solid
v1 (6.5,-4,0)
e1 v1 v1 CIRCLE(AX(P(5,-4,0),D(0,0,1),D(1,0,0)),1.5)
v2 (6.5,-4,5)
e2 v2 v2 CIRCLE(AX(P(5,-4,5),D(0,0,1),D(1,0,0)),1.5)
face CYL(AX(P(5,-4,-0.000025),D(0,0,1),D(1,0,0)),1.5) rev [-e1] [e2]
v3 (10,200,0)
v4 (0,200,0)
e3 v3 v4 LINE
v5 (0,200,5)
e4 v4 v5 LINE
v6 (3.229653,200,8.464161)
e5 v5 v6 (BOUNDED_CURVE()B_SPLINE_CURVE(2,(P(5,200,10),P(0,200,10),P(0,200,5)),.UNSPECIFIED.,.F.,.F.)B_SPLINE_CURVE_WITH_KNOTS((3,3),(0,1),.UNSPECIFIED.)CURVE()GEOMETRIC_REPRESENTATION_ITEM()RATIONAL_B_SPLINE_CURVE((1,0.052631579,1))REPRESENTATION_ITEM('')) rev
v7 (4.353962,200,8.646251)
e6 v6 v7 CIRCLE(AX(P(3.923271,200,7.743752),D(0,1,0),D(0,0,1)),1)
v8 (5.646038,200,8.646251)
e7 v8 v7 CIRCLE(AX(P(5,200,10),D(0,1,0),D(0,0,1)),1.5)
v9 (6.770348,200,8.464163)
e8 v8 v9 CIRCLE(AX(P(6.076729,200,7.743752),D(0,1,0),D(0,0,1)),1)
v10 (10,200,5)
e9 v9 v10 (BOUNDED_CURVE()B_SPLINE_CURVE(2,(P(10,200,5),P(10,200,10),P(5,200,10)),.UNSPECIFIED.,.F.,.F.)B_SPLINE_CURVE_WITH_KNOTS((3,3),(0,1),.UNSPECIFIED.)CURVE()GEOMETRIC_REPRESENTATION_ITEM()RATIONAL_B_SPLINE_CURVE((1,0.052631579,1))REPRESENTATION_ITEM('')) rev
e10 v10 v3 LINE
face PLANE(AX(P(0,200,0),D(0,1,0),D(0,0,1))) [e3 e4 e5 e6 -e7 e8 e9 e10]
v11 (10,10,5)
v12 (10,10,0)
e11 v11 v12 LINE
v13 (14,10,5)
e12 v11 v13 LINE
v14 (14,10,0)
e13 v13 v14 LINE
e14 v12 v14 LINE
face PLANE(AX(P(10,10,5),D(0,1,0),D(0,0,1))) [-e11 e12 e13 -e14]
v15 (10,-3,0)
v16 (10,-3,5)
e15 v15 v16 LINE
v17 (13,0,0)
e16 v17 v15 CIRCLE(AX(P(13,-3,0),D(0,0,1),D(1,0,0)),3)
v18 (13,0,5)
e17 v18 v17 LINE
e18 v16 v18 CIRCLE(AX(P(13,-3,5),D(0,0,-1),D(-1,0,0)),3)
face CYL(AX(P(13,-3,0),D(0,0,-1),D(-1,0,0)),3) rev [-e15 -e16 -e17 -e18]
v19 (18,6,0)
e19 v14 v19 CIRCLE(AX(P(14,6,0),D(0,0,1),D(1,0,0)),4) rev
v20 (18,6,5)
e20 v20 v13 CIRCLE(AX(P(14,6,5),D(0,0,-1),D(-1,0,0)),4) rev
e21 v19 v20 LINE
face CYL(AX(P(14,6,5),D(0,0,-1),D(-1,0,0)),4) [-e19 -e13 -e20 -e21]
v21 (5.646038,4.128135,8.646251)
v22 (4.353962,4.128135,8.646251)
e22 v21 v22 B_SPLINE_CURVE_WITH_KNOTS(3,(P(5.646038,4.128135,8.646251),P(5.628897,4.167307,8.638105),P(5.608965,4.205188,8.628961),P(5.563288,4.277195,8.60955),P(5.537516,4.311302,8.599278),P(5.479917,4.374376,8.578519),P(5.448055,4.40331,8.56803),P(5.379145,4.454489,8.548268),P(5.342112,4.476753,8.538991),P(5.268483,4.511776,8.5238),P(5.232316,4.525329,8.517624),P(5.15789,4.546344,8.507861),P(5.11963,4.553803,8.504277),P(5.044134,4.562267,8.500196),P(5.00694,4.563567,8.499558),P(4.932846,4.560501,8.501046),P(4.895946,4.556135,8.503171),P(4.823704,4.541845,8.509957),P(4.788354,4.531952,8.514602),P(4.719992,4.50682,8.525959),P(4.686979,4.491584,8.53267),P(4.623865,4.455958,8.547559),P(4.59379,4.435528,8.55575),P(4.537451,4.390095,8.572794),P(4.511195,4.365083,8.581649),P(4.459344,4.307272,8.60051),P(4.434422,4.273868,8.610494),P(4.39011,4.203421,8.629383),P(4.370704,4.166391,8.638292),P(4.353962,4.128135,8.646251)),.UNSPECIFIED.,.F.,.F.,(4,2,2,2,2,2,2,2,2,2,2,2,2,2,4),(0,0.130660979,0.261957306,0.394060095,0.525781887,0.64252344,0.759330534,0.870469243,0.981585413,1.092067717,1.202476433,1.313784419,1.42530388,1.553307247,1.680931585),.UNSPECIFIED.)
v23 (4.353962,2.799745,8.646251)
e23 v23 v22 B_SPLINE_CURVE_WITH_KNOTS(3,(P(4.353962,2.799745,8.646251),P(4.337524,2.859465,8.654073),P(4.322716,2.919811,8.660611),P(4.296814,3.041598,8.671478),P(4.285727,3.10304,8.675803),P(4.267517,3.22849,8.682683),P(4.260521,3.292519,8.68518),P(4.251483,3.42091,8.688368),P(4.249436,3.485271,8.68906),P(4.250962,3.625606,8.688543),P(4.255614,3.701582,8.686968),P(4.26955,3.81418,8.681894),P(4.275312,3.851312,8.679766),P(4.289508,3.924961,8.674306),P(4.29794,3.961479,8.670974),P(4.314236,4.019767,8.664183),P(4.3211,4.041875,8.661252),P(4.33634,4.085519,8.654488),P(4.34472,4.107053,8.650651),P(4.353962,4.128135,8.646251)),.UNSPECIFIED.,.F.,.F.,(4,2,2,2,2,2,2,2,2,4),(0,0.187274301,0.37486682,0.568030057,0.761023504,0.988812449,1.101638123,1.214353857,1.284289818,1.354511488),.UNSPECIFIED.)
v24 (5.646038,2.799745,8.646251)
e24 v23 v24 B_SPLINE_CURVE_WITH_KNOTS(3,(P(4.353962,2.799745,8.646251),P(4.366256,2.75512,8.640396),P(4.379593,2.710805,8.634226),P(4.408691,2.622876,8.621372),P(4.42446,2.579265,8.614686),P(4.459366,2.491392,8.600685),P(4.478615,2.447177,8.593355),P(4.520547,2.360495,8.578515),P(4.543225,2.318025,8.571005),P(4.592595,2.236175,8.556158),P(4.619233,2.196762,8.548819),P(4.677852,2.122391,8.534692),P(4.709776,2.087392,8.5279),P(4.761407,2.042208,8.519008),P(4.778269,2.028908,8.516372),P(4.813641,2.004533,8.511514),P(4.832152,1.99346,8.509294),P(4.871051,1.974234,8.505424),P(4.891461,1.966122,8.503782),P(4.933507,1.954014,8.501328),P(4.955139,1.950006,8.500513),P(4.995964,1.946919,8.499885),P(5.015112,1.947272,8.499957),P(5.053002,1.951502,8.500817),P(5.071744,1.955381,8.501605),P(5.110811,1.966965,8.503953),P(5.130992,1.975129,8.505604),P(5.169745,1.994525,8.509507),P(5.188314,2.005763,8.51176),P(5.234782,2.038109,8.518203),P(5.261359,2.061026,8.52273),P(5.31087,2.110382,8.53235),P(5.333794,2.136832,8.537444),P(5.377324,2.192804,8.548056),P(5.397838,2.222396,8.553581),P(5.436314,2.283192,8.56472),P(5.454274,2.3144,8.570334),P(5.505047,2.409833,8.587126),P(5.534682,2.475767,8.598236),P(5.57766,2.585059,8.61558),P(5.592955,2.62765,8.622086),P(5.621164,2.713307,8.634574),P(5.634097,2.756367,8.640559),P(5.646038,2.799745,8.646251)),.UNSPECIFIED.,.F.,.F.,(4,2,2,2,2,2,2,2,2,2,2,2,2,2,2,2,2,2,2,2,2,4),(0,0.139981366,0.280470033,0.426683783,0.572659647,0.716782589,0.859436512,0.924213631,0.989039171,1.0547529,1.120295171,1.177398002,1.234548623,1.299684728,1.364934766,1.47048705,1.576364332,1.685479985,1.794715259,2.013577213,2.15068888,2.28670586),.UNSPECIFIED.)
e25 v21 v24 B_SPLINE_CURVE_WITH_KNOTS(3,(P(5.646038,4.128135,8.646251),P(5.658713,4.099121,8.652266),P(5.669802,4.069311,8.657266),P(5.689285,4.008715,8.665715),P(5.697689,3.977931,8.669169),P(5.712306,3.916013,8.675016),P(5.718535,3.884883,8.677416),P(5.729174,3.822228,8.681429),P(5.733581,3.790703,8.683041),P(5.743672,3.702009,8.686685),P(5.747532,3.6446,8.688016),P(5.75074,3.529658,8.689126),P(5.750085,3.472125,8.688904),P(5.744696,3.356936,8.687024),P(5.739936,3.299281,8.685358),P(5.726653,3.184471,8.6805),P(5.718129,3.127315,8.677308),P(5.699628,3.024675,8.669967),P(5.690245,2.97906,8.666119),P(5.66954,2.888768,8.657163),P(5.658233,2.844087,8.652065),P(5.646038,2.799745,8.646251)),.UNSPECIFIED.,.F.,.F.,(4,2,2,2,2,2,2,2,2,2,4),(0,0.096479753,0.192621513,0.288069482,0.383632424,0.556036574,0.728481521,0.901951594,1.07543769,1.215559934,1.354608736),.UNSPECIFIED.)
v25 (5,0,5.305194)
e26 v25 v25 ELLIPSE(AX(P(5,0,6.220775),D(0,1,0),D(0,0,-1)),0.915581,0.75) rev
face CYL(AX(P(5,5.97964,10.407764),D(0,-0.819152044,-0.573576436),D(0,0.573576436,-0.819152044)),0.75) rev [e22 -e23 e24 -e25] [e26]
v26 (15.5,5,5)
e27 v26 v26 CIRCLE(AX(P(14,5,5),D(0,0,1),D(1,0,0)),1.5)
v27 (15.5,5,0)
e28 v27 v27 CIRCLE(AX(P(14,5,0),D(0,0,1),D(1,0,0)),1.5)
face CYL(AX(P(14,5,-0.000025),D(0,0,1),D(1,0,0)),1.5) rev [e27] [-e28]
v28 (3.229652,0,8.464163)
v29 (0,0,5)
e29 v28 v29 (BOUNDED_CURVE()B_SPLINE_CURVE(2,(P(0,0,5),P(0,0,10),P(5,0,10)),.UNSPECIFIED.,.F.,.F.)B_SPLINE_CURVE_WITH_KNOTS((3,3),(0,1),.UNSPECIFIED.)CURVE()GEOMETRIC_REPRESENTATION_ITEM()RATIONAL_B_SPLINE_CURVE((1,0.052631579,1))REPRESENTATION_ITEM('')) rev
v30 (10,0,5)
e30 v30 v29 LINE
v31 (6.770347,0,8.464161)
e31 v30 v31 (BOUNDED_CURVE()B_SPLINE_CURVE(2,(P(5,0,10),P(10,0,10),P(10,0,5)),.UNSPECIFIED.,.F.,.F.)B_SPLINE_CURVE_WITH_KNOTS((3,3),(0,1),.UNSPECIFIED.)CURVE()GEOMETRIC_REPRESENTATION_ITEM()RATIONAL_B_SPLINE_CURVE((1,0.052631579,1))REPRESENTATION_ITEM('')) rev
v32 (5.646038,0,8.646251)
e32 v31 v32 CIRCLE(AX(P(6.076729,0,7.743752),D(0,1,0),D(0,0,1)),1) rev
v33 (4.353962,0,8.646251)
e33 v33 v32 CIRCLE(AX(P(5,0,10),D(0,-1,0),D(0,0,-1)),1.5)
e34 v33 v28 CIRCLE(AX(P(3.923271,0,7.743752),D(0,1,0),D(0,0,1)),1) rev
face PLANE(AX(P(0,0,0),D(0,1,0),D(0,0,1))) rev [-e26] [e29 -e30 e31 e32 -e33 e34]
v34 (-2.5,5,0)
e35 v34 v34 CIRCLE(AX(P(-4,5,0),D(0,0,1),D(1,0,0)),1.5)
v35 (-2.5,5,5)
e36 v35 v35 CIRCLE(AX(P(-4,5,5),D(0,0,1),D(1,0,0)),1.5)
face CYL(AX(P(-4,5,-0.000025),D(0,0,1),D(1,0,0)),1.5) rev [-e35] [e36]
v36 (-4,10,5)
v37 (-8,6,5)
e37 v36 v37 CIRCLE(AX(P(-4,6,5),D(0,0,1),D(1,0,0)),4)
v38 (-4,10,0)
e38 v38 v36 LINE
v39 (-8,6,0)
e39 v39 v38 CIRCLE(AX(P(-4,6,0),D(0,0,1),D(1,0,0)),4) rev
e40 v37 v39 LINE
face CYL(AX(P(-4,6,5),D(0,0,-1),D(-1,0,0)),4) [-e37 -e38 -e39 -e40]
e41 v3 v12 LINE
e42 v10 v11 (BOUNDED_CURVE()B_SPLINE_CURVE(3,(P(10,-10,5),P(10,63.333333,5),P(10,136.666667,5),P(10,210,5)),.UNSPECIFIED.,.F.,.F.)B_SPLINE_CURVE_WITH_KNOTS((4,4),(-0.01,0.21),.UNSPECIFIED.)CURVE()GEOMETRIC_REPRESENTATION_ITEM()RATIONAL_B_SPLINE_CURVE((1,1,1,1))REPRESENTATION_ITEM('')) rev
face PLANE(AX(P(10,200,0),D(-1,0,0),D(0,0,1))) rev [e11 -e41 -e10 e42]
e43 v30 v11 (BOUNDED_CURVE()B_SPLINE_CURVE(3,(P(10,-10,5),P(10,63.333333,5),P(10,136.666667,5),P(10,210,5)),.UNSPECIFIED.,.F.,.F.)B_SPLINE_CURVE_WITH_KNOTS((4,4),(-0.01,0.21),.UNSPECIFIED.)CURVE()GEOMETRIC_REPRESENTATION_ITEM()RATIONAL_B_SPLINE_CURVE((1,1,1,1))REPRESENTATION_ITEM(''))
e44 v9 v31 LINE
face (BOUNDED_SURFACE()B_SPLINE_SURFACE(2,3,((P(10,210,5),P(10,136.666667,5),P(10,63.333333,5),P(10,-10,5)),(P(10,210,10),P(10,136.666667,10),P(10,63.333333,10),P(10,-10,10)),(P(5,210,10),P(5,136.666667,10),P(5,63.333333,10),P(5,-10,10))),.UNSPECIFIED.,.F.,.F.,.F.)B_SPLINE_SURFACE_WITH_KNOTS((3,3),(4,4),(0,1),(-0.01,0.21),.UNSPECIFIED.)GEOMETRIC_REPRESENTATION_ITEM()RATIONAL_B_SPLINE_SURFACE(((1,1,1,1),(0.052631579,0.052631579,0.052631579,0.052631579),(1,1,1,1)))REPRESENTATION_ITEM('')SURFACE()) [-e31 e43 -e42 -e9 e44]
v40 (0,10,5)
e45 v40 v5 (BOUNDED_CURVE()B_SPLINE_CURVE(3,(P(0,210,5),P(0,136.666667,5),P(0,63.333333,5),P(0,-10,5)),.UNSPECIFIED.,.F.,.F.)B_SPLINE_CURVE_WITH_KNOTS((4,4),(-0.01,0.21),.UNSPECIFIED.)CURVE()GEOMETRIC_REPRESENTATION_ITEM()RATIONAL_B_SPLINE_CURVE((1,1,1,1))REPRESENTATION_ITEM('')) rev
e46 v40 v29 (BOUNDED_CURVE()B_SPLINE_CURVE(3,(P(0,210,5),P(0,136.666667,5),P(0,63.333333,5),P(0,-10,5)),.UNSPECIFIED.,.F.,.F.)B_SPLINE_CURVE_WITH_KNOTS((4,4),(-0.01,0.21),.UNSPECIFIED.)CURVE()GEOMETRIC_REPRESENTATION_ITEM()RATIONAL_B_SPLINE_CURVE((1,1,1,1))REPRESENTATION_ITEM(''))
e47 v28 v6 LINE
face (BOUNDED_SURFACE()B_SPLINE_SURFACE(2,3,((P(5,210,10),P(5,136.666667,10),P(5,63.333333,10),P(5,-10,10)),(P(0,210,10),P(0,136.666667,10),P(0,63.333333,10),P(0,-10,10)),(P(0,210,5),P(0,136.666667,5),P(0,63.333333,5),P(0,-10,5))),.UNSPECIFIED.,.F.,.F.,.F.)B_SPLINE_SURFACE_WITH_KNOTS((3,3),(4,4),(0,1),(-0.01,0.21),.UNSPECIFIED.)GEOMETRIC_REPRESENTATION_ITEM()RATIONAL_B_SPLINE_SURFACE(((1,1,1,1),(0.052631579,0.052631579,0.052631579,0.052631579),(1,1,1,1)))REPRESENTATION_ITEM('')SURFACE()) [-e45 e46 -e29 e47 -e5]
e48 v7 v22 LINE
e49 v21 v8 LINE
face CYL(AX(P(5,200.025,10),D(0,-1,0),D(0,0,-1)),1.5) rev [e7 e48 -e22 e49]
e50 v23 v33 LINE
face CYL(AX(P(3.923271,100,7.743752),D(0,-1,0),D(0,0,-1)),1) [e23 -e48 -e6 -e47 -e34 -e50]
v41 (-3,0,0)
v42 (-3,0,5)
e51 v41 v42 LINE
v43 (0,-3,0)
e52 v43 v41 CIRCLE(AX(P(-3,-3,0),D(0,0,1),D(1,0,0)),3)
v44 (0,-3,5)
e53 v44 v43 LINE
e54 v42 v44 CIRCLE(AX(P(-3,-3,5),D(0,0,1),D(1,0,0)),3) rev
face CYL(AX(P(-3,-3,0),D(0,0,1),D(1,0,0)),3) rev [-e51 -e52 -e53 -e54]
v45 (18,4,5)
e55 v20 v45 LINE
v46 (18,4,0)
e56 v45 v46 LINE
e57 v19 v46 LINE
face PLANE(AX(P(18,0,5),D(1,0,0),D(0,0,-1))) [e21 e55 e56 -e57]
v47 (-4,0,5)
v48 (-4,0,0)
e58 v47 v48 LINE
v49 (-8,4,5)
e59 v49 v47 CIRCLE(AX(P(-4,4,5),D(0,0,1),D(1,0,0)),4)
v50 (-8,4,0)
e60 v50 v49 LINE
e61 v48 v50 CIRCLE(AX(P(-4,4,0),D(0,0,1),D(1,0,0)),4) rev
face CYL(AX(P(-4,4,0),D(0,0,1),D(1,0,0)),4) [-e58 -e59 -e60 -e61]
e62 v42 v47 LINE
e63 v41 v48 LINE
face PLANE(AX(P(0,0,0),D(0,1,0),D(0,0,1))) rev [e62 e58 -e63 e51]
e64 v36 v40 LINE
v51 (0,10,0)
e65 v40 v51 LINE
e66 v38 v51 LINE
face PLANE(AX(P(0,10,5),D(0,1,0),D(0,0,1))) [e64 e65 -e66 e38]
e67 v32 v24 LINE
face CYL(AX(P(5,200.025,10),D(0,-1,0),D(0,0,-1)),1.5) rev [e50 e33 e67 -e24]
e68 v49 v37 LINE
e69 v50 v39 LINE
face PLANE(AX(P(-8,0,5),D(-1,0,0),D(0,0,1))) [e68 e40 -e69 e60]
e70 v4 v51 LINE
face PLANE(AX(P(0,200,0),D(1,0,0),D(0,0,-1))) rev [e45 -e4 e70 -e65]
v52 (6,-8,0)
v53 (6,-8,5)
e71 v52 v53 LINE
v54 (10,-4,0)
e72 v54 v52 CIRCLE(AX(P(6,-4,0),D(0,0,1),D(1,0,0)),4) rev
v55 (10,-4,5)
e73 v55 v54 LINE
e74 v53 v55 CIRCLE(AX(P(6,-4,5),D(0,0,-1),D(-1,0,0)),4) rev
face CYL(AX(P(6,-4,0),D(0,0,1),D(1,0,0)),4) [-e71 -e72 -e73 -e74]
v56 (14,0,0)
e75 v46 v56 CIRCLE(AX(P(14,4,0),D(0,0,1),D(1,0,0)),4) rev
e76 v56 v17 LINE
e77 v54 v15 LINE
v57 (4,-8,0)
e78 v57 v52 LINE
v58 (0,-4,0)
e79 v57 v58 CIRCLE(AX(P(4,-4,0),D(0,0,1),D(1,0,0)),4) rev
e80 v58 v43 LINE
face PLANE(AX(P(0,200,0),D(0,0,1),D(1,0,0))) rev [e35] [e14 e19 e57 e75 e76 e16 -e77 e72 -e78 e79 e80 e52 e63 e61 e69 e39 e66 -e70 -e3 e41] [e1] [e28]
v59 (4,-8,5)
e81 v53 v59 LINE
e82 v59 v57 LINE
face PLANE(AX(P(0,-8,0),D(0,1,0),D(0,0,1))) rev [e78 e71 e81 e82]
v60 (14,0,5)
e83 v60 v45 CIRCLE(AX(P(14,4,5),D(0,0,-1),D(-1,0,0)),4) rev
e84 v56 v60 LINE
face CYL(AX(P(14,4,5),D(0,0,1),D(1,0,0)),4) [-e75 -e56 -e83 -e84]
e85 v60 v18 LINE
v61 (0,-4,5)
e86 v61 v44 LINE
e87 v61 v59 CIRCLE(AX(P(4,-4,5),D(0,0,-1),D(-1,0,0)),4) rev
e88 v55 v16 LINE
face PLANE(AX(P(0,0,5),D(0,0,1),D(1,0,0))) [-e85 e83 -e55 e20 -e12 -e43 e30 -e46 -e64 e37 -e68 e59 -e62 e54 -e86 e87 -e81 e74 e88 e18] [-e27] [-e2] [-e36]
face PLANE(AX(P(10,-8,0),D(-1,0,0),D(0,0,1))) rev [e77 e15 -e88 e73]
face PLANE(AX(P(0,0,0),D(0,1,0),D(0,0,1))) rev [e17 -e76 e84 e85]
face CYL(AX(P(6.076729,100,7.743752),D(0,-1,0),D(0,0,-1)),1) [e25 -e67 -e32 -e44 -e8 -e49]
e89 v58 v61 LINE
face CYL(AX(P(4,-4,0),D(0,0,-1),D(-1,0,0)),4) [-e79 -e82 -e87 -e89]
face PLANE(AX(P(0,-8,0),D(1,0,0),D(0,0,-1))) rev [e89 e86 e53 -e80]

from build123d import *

# Parameters (mm, degrees)
SKETCH1_W           = 10
SKETCH1_H           = 10
BOSS_EXTRUDE1_DEPTH = 200
FILLET1_SIZE        = 5
SKETCH2_R           = 1.5
CUT_EXTRUDE1_DEPTH  = 201.499376667
FILLET2_R           = 1
SKETCH4_W           = 8
SKETCH4_H           = 10
BOSS_EXTRUDE2_DEPTH = 5
SKETCH5_W           = 10
SKETCH5_H           = 5
BOSS_EXTRUDE3_DEPTH = 8
FILLET3_R           = 4
FILLET4_R           = 3
SKETCH6_R           = 1.5
CUT_EXTRUDE3_DEPTH  = 201.870605219
SKETCH7_R           = 0.75
CUT_EXTRUDE4_DEPTH  = 8


with BuildPart() as part:
    # Sketch1 → Boss-Extrude1 (new body)
    with BuildSketch(Plane(origin=(0, 0, 0), x_dir=(1, 0, 0), z_dir=(0, 1, 0))):
        with Locations((5, -5)):
            Rectangle(SKETCH1_W, SKETCH1_H)
    extrude(amount=BOSS_EXTRUDE1_DEPTH)

    # Fillet1
    # a fillet whose section is not a circle: 5 mm, written as the material it takes off along each edge
    with BuildSketch(Plane(origin=(0, -12.5, 10), x_dir=(1, 0, 0), z_dir=(0, 1, 0)), Plane(origin=(10, -12.5, 10), x_dir=(0, 0, -1), z_dir=(0, 1, 0))) as fillet1_piece_1:
        with BuildLine():
            Bezier((FILLET1_SIZE, 0), (0, 0), (0, FILLET1_SIZE), weights=[1, 0.052631579, 1])
            Line((0, FILLET1_SIZE), (0, 0))
            Line((0, 0), (FILLET1_SIZE, 0))
        make_face()
    extrude(amount=225, mode=Mode.SUBTRACT)

    # Sketch2 → Cut-Extrude1 (cut, through all)
    with BuildSketch(Plane(origin=(0, 0, 0), x_dir=(-1, 0, 0), z_dir=(0, -1, 0))):
        with Locations((-5, -10)):
            Circle(SKETCH2_R)
    extrude(amount=-CUT_EXTRUDE1_DEPTH, mode=Mode.SUBTRACT)

    # Fillet2
    fillet2_edges = [part.edges().sort_by_distance(p)[0] for p in [
        (3.843309936, 100, 9.044977437),
        (6.156690064, 100, 9.044977437),
    ]]
    fillet(fillet2_edges, radius=FILLET2_R)

    # Sketch4 → Boss-Extrude2 (add)
    with BuildSketch(Plane(origin=(0, 0, 0), x_dir=(-1, 0, 0), z_dir=(0, 0, -1))):
        with Locations((4, 5)):
            Rectangle(SKETCH4_W, SKETCH4_H)
        with Locations((-14, 5)):
            Rectangle(SKETCH4_W, SKETCH4_H)
    extrude(amount=-BOSS_EXTRUDE2_DEPTH)

    # Sketch5 → Boss-Extrude3 (add)
    with BuildSketch(Plane(origin=(0, 0, 0), x_dir=(-1, 0, 0), z_dir=(0, -1, 0))):
        with Locations((-5, -2.5)):
            Rectangle(SKETCH5_W, SKETCH5_H)
    extrude(amount=BOSS_EXTRUDE3_DEPTH)

    # Fillet3
    fillet3_edges = [part.edges().sort_by_distance(p)[0] for p in [
        (18, 10, 2.5),
        (18, 0, 2.5),
        (10, -8, 2.5),
        (0, -8, 2.5),
        (-8, 10, 2.5),
        (-8, 0, 2.5),
    ]]
    fillet(fillet3_edges, radius=FILLET3_R)

    # Fillet4
    # the kernel refuses this fillet: 3 mm, written as the material it adds along each edge
    with BuildSketch(Plane(origin=(10, 0, 0), x_dir=(1, 0, 0), z_dir=(0, 0, 1)), Plane(origin=(0, 0, 5), x_dir=(-1, 0, 0), z_dir=(0, 0, -1))) as fillet4_piece_1:
        with BuildLine():
            CenterArc((FILLET4_R, -FILLET4_R), FILLET4_R, 90, 90)
            Line((0, -FILLET4_R), (0, 0))
            Line((0, 0), (FILLET4_R, 0))
        make_face()
    extrude(amount=5)

    # Sketch6 → Cut-Extrude3 (cut, through all)
    with BuildSketch(Plane.XY.offset(5)):
        with Locations((-4, 5)):
            Circle(SKETCH6_R)
        with Locations((14, 5)):
            Circle(SKETCH6_R)
        with Locations((5, -4)):
            Circle(SKETCH6_R)
    extrude(amount=-CUT_EXTRUDE3_DEPTH, mode=Mode.SUBTRACT)

    # Sketch7 → Cut-Extrude4 (cut)
    with BuildSketch(Plane(origin=(0, 2.349231552, 1.644949642), x_dir=(-1, 0, 0), z_dir=(0, 0.8191520442889949, 0.5735764363510416))):
        with Locations(Location((-5, 5.095760221, 0), (0, 0, 270))):
            Circle(SKETCH7_R)
    extrude(amount=CUT_EXTRUDE4_DEPTH, mode=Mode.SUBTRACT)


solid = part.part
